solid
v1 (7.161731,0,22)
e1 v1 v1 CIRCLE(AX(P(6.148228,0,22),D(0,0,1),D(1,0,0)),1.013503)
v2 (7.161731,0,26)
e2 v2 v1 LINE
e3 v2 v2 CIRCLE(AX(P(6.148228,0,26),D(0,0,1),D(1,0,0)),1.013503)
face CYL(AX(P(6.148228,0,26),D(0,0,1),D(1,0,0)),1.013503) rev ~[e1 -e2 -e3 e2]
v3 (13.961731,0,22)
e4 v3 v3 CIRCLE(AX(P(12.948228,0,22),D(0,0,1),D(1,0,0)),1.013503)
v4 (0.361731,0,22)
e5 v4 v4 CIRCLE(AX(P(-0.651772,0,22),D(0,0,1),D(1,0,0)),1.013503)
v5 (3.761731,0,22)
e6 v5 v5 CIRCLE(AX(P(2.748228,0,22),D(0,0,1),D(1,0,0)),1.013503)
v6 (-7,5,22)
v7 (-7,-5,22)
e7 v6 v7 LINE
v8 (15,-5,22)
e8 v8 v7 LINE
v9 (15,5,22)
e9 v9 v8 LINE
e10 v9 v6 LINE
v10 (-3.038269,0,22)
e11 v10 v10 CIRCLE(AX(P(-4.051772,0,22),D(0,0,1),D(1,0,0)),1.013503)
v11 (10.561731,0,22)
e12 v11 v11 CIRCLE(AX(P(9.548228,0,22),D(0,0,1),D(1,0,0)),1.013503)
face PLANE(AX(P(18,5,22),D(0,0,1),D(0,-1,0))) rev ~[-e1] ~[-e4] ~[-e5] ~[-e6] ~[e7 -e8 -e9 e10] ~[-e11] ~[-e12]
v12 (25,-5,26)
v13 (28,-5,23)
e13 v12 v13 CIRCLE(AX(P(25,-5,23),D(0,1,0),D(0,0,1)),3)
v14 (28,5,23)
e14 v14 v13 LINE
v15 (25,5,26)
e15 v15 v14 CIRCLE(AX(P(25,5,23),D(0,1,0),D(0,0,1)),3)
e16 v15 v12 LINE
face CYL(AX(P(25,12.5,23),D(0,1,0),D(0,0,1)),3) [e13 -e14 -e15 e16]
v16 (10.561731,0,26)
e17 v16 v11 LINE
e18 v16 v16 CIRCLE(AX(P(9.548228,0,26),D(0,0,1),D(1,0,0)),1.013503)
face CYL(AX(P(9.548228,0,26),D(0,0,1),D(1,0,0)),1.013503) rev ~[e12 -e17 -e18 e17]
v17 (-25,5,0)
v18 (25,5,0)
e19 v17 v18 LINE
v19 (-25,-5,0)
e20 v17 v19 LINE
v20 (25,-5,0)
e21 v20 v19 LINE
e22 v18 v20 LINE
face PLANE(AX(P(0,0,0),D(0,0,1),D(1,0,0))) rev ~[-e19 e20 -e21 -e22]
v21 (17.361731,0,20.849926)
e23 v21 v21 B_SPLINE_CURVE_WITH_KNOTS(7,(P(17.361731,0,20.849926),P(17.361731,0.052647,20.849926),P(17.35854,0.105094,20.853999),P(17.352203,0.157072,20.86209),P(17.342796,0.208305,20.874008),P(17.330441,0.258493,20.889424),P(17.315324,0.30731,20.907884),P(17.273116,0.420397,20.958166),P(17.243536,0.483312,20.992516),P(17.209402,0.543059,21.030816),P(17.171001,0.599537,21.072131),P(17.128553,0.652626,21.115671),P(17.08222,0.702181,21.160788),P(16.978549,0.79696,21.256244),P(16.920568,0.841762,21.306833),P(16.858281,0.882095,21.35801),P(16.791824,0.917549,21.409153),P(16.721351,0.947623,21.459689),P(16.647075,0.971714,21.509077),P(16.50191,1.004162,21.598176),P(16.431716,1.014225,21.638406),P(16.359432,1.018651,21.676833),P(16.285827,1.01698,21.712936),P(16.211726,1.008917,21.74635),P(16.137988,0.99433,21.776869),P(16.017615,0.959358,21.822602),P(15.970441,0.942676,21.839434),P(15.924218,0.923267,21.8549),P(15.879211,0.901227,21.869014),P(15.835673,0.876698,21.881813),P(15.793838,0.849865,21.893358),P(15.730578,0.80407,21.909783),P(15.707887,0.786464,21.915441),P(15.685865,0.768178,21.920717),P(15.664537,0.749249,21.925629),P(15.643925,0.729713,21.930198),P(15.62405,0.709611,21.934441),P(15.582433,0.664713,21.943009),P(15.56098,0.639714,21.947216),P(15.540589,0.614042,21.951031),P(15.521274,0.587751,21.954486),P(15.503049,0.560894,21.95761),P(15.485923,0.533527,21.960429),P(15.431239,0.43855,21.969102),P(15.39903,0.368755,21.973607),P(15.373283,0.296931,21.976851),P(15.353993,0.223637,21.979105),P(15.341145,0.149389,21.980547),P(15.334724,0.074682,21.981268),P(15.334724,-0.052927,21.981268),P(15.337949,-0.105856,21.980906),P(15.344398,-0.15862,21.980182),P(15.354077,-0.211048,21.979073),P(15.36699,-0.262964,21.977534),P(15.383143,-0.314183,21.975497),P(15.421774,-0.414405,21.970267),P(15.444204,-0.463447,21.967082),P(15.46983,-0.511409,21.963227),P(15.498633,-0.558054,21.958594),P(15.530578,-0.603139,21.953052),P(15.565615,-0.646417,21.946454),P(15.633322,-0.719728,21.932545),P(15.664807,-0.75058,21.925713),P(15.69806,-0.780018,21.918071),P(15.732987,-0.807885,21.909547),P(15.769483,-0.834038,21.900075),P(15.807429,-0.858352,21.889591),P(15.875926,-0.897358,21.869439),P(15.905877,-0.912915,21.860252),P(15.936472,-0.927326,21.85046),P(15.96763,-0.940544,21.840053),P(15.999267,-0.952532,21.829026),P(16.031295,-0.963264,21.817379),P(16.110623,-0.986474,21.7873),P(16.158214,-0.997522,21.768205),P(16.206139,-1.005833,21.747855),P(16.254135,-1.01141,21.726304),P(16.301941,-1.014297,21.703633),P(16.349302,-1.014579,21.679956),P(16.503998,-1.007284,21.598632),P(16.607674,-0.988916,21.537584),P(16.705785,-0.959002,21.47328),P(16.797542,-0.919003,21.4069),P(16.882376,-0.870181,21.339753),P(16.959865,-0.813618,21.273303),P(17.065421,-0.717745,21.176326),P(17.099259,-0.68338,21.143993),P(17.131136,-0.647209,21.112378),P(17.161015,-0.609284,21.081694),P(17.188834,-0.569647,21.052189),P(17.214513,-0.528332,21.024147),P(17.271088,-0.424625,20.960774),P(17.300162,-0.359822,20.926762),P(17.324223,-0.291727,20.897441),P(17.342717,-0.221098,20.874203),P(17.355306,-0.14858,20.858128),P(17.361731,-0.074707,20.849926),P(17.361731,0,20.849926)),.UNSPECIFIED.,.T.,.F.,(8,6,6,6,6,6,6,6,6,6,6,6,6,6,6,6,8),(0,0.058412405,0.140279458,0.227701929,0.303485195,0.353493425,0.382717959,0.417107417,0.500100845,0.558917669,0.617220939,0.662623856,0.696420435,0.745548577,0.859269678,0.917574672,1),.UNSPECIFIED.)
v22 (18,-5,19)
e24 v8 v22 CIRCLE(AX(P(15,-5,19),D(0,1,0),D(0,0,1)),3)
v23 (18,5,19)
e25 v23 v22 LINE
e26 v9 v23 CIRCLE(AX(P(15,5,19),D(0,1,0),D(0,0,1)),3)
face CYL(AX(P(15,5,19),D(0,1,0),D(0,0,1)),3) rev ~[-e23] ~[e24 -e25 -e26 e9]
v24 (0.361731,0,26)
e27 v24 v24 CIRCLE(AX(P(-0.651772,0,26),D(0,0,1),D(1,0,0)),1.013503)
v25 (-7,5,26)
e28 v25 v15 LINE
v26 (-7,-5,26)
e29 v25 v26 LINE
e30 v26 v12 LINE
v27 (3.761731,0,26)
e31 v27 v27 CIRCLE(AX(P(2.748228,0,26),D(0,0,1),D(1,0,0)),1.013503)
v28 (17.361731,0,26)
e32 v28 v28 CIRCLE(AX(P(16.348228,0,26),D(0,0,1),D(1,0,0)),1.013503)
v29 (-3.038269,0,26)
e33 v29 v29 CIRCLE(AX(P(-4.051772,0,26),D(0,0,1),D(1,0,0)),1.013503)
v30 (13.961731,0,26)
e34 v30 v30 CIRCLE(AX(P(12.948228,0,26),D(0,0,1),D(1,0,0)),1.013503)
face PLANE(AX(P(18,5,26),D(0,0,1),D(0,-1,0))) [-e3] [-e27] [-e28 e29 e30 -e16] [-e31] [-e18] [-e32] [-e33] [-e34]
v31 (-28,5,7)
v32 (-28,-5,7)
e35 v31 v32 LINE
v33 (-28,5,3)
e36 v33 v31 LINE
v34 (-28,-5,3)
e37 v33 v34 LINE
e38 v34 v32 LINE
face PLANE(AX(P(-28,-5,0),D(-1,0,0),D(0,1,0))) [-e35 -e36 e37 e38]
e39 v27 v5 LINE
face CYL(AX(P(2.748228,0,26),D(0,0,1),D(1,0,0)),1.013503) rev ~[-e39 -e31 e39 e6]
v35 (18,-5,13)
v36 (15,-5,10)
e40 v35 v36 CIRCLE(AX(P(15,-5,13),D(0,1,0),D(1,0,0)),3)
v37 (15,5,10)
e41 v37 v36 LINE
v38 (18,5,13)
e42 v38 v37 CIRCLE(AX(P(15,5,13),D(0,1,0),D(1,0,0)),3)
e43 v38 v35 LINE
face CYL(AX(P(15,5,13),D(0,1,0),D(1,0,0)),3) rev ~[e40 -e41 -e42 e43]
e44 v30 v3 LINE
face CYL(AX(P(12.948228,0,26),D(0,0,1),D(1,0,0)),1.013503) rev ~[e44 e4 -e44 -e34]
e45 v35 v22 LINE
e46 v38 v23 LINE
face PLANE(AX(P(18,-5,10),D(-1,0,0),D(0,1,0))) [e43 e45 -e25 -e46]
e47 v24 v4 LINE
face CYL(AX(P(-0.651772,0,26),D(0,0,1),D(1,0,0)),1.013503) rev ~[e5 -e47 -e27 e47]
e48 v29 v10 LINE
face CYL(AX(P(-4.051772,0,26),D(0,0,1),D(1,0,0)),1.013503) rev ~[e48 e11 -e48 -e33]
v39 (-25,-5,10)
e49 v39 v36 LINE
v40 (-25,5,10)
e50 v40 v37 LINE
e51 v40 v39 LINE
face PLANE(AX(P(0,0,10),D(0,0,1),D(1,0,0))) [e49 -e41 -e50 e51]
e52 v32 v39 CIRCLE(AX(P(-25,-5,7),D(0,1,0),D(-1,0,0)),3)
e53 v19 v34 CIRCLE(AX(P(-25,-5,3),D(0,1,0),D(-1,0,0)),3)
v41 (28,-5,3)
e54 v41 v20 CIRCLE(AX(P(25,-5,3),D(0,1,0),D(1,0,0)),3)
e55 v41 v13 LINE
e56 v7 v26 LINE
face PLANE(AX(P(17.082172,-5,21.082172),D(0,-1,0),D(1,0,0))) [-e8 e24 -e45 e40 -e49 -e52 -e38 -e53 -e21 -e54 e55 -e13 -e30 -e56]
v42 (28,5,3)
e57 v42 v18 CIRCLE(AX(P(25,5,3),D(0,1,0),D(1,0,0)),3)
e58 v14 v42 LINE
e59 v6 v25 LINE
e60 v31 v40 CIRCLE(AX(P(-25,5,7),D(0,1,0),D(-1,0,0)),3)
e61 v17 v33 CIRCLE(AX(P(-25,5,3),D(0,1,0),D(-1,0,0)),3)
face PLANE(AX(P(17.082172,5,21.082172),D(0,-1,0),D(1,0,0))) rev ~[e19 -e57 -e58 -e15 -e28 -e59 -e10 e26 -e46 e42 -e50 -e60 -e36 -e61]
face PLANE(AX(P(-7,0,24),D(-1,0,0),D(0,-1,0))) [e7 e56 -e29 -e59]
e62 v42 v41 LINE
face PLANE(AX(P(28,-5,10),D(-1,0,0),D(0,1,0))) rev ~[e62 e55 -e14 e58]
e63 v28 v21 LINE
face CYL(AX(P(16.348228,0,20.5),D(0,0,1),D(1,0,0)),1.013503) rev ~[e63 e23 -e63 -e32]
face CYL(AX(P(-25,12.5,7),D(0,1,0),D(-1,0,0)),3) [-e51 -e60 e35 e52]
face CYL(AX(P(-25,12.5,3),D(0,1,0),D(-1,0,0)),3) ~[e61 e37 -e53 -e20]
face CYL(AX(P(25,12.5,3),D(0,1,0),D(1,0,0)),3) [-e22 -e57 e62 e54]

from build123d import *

# Parameters (mm, degrees)
F0_W         = 56
F0_H         = 10
F1_DEPTH     = 1.8
F2_R         = 3
F3_DEPTH     = 10
F4_W         = 10
F4_H         = 10
F5_DEPTH     = 16
F6_W         = 10
F6_H         = 4
F7_DEPTH     = 25
F8_R         = 1.0135034558
F9_DEPTH     = 10
F10_T1_DEPTH = 10
F10_T6_DEPTH = 10
F10_S7_R     = 1.0135034558
F10_T8_DEPTH = 7
F10_T9_DEPTH = 25


# Not quite as in the source:
# - a fillet or chamfer that OpenCascade refuses, or shapes differently, is made with other operations: its cross-section is extruded or revolved along the edge and cut away or added


with BuildPart() as f1:
    # F0 (on Top) → F1 (new body)
    with BuildSketch(Plane.XY):
        Rectangle(F0_W, F0_H)
    extrude(amount=F1_DEPTH)

    # F2
    f2_edges = [f1.edges().sort_by_distance(p)[0] for p in [
        (-28, 5, 0.9),
        (28, 5, 0.9),
        (28, -5, 0.9),
        (-28, -5, 0.9),
    ]]
    fillet(f2_edges, radius=F2_R)

    # F0 (on Top) → F3 (join)
    with BuildSketch(Plane.XY):
        Rectangle(F0_W, F0_H)
    extrude(amount=F3_DEPTH)

    # F4 (on face) → F5 (join)
    with BuildSketch(Plane.XY.offset(10)):
        with Locations((23, 0)):
            Rectangle(F4_W, F4_H)
    extrude(amount=F5_DEPTH)

    # F6 (on face) → F7 (join)
    with BuildSketch(Plane(origin=(18, 0, 0), x_dir=(0, -1, 0), z_dir=(-1, 0, 0))):
        with Locations((0, 24)):
            Rectangle(F6_W, F6_H)
    extrude(amount=F7_DEPTH)

    # F8 (on face) → F9 (cut)
    with BuildSketch(Plane.XY.offset(26)):
        with Locations((-4.0517724119, 0)):
            Circle(F8_R)
        with Locations((-0.6517724119, 0)):
            Circle(F8_R)
        with Locations((2.7482275881, 0)):
            Circle(F8_R)
        with Locations((6.1482275881, 0)):
            Circle(F8_R)
        with Locations((9.5482275881, 0)):
            Circle(F8_R)
        with Locations((12.9482275881, 0)):
            Circle(F8_R)
        with Locations((16.3482275881, 0)):
            Circle(F8_R)
    extrude(amount=-F9_DEPTH, mode=Mode.SUBTRACT)

    # F10: fillet of radius 3 on 6 edges, made by hand

    # F10_s2 → F10_t1 (join)
    with BuildSketch(Plane.XZ.offset(-5)):
        with BuildLine():
            ThreePointArc((18, 13), (17.1213203436, 10.8786796564), (15, 10))
            Line((15, 10), (18, 10))
            Line((18, 10), (18, 13))
        make_face()
    extrude(amount=F10_T1_DEPTH)


with BuildPart() as f10_tool4:
    # F10_s5 → F10_t6 (new body)
    with BuildSketch(Plane.XZ.offset(-5)):
        with BuildLine():
            ThreePointArc((15, 22), (17.1213203436, 21.1213203436), (18, 19))
            Line((18, 19), (18, 22))
            Line((18, 22), (15, 22))
        make_face()
    extrude(amount=F10_T6_DEPTH)

    # F10_s7 → F10_t8 (cut, symmetric)
    with BuildSketch(Plane.XY.offset(20.5)):
        with Locations((16.3482275881, 0)):
            Circle(F10_S7_R)
    extrude(amount=F10_T8_DEPTH, both=True, mode=Mode.SUBTRACT)


with BuildPart() as f1_1:
    add(f1.part)

    # F10_t3: union F10_tool4
    add(f10_tool4.part)

    # F10_s10 → F10_t9 (cut)
    with BuildSketch(Plane.XZ.offset(-12.5)):
        with BuildLine():
            ThreePointArc((25, 26), (27.1213203436, 25.1213203436), (28, 23))
            Line((28, 23), (28, 26))
            Line((28, 26), (25, 26))
        make_face()
        with BuildLine():
            ThreePointArc((28, 3), (27.1213203436, 0.8786796564), (25, 0))
            Line((25, 0), (28, 0))
            Line((28, 0), (28, 3))
        make_face()
        with BuildLine():
            ThreePointArc((-28, 3), (-27.1213203436, 0.8786796564), (-25, 0))
            Line((-25, 0), (-28, 0))
            Line((-28, 0), (-28, 3))
        make_face()
        with BuildLine():
            ThreePointArc((-28, 7), (-27.1213203436, 9.1213203436), (-25, 10))
            Line((-25, 10), (-28, 10))
            Line((-28, 10), (-28, 7))
        make_face()
    extrude(amount=F10_T9_DEPTH, mode=Mode.SUBTRACT)


solid = f1_1.part
